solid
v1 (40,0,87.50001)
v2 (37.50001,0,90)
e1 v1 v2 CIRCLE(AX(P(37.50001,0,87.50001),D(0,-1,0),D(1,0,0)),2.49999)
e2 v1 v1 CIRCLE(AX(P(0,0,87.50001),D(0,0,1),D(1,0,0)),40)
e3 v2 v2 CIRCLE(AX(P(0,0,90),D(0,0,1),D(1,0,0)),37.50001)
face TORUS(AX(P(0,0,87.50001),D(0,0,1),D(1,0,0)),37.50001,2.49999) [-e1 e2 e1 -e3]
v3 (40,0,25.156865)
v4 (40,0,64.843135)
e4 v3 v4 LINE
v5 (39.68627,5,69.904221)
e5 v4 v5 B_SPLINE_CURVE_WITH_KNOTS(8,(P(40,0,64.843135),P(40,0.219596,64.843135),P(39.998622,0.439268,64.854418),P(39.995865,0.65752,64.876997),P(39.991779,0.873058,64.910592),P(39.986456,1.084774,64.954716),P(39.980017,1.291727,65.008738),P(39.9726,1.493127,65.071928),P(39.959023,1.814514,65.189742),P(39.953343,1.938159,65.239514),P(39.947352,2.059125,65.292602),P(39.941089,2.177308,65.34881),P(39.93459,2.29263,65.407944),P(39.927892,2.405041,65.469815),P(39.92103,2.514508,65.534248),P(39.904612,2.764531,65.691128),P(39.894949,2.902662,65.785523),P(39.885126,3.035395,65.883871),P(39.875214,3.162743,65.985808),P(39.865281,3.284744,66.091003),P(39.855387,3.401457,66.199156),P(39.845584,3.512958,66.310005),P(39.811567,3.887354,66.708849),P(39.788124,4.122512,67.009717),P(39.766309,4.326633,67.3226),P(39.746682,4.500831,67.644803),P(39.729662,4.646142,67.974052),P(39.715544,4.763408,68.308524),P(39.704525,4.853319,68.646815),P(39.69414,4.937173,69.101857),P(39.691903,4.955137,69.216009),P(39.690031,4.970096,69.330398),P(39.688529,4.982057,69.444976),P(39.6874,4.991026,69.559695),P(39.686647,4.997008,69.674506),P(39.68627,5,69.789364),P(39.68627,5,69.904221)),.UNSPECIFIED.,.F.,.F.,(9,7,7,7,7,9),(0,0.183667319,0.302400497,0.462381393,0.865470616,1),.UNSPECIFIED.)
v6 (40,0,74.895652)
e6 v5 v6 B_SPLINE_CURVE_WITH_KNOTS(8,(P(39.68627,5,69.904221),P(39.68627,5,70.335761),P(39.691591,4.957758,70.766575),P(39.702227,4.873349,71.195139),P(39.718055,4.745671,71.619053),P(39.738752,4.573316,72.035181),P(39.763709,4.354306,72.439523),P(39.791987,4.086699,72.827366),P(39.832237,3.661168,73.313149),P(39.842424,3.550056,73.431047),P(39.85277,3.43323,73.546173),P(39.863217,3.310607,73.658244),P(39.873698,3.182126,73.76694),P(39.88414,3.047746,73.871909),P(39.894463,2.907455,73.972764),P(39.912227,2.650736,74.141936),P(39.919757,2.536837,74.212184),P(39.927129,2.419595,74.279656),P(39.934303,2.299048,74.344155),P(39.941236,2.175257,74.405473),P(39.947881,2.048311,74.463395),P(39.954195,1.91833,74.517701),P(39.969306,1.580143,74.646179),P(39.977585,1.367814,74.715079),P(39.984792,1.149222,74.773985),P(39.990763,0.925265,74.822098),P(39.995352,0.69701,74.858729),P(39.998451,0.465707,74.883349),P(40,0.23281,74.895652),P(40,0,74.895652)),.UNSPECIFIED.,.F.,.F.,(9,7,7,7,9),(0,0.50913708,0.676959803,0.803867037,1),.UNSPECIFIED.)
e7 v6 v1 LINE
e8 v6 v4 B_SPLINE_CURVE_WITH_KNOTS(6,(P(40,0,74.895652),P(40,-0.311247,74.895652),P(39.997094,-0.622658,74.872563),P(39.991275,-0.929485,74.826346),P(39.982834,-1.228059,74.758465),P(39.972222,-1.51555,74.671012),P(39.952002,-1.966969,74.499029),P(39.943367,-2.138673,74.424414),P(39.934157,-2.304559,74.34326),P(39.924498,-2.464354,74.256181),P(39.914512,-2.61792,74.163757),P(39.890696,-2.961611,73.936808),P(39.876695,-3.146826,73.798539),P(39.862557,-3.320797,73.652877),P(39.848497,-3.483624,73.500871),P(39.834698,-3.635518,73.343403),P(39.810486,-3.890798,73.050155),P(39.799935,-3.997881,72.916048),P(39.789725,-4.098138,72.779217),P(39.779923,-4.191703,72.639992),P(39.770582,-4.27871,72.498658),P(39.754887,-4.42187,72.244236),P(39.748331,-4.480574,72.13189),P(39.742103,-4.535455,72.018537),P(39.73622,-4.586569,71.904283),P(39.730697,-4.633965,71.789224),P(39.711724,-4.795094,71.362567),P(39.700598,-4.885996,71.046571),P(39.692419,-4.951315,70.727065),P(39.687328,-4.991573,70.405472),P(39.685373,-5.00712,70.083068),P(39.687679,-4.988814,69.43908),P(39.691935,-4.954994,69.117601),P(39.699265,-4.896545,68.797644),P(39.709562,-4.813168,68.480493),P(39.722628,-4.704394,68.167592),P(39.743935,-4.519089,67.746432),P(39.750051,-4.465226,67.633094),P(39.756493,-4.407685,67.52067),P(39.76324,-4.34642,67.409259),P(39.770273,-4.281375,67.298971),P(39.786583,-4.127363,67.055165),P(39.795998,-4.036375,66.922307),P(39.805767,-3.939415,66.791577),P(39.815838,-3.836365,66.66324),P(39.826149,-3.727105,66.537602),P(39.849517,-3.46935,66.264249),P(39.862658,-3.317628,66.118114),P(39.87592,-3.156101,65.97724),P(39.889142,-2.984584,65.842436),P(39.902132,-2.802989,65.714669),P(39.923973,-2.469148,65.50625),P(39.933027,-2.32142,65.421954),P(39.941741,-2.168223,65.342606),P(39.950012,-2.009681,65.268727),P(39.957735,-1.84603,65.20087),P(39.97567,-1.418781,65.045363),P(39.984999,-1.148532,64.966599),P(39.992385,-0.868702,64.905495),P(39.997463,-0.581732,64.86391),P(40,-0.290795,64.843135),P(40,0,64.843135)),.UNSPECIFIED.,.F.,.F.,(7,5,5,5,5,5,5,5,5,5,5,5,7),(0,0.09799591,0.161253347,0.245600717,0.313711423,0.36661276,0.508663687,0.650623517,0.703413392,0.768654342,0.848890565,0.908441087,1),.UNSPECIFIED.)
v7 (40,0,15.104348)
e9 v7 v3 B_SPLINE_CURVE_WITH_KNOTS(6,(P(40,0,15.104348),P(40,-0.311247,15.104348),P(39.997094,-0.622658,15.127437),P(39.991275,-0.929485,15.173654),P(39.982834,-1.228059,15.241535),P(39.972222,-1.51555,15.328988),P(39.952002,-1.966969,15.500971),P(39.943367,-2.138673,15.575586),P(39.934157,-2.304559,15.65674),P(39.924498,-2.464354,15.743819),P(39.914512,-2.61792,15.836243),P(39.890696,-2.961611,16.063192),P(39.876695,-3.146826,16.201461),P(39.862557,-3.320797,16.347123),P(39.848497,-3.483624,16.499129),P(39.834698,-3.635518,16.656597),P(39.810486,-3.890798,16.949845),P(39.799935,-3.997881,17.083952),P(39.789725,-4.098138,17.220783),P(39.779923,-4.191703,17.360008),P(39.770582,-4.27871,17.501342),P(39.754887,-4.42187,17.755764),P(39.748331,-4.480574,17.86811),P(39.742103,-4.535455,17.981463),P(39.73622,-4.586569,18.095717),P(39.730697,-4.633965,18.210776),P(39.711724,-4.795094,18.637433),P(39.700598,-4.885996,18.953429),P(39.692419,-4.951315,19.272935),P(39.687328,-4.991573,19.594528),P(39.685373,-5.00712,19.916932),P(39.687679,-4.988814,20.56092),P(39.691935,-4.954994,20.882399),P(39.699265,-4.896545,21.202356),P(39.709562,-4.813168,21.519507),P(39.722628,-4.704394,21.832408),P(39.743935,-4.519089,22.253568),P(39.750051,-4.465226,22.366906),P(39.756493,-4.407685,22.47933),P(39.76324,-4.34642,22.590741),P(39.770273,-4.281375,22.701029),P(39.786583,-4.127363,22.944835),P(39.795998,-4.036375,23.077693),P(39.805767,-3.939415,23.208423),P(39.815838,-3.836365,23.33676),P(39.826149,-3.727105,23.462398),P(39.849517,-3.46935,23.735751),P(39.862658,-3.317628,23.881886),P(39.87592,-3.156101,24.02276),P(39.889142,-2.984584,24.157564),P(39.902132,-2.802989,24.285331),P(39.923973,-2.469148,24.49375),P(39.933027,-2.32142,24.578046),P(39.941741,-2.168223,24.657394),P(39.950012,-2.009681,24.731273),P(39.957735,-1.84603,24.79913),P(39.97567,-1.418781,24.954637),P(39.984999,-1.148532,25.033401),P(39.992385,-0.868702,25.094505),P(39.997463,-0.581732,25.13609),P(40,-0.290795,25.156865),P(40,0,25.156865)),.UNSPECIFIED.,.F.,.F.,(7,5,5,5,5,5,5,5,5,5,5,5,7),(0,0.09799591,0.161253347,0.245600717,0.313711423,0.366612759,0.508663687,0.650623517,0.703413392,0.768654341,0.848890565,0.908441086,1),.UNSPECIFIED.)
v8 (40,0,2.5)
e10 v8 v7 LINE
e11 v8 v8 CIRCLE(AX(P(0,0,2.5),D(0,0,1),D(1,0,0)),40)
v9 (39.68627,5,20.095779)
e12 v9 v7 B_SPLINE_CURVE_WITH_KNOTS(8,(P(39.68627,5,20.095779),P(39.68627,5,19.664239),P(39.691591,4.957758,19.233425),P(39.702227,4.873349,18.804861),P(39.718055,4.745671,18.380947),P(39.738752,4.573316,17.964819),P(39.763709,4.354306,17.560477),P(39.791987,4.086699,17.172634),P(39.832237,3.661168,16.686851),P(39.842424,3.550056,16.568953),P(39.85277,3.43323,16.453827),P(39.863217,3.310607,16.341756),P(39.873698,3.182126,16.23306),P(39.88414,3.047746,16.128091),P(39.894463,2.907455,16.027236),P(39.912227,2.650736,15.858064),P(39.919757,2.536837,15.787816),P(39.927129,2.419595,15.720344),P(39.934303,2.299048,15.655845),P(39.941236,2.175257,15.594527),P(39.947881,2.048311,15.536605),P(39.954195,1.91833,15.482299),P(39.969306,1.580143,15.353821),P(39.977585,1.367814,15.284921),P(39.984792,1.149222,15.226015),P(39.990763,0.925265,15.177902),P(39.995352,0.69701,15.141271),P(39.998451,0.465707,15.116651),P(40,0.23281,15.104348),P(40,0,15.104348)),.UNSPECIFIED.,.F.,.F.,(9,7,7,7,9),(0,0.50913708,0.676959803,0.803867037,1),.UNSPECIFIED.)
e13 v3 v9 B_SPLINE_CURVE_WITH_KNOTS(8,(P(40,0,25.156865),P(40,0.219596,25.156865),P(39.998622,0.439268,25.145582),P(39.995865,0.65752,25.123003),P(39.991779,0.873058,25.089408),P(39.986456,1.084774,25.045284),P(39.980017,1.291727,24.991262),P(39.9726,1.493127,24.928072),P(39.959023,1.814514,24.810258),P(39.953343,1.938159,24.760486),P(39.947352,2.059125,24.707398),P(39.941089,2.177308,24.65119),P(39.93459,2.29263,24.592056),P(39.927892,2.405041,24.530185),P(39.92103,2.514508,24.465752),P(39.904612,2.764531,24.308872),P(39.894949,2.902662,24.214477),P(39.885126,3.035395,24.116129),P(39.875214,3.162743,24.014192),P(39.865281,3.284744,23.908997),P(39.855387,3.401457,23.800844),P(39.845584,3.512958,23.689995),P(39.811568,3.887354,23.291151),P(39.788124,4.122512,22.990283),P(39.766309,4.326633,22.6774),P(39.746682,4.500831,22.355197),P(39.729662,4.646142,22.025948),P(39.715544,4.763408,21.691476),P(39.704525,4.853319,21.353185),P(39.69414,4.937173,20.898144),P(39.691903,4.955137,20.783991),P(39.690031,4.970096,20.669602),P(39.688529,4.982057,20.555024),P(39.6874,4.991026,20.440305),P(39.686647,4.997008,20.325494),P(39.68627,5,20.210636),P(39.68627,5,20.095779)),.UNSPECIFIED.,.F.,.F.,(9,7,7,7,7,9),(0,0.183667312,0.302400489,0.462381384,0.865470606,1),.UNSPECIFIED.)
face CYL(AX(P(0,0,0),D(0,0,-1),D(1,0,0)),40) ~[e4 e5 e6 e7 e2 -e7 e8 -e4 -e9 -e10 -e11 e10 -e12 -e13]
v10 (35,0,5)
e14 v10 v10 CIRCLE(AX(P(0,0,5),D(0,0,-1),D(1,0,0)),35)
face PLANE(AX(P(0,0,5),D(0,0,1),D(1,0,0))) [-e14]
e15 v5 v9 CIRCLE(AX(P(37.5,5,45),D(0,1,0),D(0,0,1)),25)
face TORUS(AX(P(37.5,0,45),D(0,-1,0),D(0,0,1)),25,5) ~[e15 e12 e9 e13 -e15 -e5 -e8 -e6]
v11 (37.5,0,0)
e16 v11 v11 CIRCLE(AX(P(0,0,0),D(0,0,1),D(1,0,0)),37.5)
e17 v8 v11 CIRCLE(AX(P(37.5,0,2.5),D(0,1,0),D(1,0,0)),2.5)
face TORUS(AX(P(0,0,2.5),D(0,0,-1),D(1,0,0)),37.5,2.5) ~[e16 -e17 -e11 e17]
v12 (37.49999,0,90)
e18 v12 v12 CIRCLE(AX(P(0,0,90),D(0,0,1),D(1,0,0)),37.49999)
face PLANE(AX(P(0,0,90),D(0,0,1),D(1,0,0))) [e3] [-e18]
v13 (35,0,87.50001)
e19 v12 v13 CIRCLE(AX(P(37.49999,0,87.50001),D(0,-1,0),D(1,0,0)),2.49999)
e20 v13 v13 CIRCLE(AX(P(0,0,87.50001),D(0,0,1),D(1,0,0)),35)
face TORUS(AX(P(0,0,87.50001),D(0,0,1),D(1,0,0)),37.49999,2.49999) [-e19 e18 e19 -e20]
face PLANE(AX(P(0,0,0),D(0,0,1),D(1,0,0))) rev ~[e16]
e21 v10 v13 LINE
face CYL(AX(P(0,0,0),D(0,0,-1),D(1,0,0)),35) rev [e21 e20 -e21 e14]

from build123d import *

# Parameters (mm, degrees)
F0_R     = 40
F1_DEPTH = 90
F2_T     = -5
F4_R     = 5
F5_ANGLE = 180
F6_R     = 2.49999
F7_R     = 2.5


# Not quite as in the source:
# - a fillet or chamfer is up to 0.001 mm smaller than in the source, because OpenCascade refuses the exact size


with BuildPart() as f1:
    # F0 (on Top) → F1 (new body)
    with BuildSketch(Plane.XY):
        Circle(F0_R)
    extrude(amount=F1_DEPTH)

    # F2
    f2_openings = [f1.faces().sort_by_distance(p)[0] for p in [
        (0, 0, 90),
    ]]
    offset(amount=F2_T, openings=f2_openings)

    # F4 (on offset) → F5 (revolve)
    with BuildSketch(Plane.YZ.offset(37.5)):
        with Locations((0, 70)):
            Circle(F4_R)
    revolve(axis=Axis((37.5, 33.2942344248, 45), (0, 1, 0)), revolution_arc=F5_ANGLE)

    # F6 (radius 2.5 in the source; OpenCascade refuses exactly that, so slightly less here)
    f6_edges = [f1.edges().sort_by_distance(p)[0] for p in [
        (-40, 0, 90),
        (-35, 0, 90),
    ]]
    fillet(f6_edges, radius=F6_R)

    # F7
    f7_edges = [f1.edges().sort_by_distance(p)[0] for p in [
        (-40, 0, 0),
    ]]
    fillet(f7_edges, radius=F7_R)


solid = f1.part
